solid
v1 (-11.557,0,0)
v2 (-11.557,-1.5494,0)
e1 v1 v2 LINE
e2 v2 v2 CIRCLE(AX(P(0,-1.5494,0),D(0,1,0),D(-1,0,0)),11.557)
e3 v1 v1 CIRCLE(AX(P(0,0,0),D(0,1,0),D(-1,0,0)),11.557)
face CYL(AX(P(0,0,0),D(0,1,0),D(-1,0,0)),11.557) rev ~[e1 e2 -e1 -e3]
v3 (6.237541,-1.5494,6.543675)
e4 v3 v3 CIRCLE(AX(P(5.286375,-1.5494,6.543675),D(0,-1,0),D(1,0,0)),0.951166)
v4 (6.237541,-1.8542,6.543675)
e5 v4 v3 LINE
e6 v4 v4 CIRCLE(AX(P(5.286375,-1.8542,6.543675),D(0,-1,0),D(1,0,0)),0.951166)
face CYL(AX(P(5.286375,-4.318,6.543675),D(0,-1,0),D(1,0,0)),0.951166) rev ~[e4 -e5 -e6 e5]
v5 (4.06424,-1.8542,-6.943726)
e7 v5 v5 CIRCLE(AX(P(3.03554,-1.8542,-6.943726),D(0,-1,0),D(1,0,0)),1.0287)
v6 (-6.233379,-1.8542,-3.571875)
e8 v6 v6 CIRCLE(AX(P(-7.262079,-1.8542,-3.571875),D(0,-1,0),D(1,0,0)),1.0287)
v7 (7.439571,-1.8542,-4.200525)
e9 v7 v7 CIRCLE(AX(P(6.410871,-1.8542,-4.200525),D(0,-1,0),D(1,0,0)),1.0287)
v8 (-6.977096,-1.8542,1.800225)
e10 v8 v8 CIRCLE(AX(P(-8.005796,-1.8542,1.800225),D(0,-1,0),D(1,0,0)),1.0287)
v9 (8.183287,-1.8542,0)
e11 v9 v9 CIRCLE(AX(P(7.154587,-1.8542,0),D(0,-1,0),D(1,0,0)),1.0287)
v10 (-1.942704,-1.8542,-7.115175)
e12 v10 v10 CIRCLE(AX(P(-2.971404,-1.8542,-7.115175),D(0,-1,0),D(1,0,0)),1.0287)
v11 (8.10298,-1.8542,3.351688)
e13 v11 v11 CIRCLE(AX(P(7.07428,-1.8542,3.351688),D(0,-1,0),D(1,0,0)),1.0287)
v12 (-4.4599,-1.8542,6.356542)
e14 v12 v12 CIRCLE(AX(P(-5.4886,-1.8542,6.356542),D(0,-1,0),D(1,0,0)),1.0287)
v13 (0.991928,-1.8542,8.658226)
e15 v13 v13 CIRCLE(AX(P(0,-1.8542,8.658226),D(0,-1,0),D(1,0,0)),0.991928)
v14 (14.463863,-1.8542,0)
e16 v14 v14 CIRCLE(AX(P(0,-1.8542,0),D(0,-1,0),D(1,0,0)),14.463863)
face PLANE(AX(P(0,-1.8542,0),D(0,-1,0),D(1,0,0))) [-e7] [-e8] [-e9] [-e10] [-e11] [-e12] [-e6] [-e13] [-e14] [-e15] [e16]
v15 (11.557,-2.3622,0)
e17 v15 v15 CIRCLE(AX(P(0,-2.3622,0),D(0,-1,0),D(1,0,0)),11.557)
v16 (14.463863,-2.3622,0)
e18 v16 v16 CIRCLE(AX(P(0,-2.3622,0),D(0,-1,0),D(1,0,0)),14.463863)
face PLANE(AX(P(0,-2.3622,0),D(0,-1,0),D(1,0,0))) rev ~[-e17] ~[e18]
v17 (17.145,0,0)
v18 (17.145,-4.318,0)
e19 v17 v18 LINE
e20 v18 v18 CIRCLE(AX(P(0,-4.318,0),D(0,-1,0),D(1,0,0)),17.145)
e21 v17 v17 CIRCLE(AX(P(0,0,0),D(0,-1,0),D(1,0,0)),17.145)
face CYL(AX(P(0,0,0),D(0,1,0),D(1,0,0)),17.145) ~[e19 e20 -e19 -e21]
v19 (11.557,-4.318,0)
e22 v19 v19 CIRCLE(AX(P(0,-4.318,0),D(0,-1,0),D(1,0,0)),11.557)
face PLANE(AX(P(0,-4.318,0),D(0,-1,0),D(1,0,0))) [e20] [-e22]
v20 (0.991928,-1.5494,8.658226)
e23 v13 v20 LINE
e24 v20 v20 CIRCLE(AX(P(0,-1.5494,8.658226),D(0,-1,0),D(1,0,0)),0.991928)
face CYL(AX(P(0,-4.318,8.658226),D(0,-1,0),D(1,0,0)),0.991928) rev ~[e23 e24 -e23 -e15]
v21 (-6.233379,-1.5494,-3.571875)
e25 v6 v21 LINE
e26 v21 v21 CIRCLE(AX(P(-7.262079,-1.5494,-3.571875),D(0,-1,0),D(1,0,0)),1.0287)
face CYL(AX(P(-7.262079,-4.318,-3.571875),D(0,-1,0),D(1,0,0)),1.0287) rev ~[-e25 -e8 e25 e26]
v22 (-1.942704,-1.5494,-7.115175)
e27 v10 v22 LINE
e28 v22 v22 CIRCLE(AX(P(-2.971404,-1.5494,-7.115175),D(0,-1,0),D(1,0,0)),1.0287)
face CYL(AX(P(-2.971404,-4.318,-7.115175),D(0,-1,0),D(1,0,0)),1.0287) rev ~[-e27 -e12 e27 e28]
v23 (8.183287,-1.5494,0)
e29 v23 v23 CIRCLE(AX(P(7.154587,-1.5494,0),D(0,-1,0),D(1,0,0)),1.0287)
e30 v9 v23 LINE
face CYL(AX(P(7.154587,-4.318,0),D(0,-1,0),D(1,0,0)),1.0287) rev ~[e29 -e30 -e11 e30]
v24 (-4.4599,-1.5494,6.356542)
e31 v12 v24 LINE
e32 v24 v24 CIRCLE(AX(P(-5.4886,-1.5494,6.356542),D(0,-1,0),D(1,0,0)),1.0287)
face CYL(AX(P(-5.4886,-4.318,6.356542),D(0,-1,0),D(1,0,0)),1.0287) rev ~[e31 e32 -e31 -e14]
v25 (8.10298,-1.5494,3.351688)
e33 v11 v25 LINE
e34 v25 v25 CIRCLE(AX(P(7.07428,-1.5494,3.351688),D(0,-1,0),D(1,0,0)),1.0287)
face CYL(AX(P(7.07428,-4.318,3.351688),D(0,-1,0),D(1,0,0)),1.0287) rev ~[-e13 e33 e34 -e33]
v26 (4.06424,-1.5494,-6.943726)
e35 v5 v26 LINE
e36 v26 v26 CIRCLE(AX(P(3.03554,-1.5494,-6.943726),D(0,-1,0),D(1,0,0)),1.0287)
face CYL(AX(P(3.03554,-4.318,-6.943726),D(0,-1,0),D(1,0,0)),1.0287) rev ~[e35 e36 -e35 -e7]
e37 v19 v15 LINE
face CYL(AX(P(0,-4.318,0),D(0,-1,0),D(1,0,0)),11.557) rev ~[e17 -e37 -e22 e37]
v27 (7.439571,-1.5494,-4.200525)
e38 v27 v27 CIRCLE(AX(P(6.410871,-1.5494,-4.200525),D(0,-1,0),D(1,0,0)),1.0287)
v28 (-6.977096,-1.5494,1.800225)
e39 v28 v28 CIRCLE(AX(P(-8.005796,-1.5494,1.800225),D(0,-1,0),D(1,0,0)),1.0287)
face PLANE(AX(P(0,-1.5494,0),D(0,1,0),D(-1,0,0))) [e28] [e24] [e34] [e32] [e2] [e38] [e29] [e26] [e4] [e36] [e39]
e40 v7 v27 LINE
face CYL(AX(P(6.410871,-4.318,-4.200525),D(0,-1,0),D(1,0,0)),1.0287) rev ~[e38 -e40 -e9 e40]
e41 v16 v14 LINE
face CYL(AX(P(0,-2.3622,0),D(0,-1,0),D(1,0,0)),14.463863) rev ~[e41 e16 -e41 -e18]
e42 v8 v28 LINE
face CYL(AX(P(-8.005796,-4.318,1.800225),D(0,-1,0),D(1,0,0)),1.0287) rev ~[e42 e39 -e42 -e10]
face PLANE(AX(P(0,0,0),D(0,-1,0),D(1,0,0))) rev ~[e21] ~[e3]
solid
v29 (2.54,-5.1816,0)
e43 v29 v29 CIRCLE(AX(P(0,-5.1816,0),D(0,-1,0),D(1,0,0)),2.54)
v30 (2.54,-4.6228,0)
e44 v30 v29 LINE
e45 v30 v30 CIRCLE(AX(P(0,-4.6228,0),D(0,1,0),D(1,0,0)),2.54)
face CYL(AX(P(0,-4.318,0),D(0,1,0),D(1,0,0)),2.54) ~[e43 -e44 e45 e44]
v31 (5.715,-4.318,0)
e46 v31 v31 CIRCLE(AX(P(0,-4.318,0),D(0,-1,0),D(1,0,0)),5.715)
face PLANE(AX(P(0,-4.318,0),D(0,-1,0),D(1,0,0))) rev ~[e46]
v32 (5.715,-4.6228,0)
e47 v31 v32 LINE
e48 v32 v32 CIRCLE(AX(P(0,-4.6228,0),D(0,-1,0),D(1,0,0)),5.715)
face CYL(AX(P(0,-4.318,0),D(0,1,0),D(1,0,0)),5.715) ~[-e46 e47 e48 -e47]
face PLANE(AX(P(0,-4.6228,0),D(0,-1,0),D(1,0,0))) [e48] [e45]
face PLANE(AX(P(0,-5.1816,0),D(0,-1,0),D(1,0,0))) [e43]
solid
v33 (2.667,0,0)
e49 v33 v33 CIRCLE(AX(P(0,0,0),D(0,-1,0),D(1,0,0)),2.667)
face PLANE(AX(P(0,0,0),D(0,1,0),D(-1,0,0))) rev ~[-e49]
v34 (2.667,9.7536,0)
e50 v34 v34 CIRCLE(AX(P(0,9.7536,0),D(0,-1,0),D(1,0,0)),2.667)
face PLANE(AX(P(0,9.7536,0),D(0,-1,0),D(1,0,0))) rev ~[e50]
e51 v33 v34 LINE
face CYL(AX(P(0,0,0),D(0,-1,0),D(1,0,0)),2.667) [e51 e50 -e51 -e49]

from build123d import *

# Parameters (mm, degrees)
F0_R      = 17.145
F1_DEPTH  = 4.318
F2_R      = 2.667
F3_DEPTH  = 9.7536
F4_R      = 2.54
F5_DEPTH  = 0.8636
F6_R      = 5.715
F7_DEPTH  = 0.3048
F8_R      = 11.557
F9_DEPTH  = 1.9558
F10_R     = 14.4638625387
F11_DEPTH = 0.508
F12_R     = 0.9919276493
F13_DEPTH = 35.4076
F14_R     = 11.557
F15_DEPTH = 1.5494
F18_R     = 0.9511664252
F19_DEPTH = 25.4
F20_R     = 1.0287
F21_DEPTH = 25.4
F22_R     = 1.0287
F23_DEPTH = 25.4


# Not quite as in the source:
# - the program builds the solid bodies; features that only make, move or delete a surface that nothing else refers to are left out


with BuildPart() as f1:
    # F0 (on Front) → F1 (new body)
    with BuildSketch(Plane.XZ):
        Circle(F0_R)
    extrude(amount=F1_DEPTH)

    # F2 (on Front) → F3 (join)
    with BuildSketch(Plane.XZ):
        Circle(F2_R)
    extrude(amount=-F3_DEPTH)

    # F4 (on face) → F5 (join)
    with BuildSketch(Plane.XZ.offset(4.318)):
        Circle(F4_R)
    extrude(amount=F5_DEPTH)

    # F6 (on face) → F7 (join)
    with BuildSketch(Plane.XZ.offset(4.318)):
        Circle(F6_R)
    extrude(amount=F7_DEPTH)

    # F8 (on face) → F9 (cut)
    with BuildSketch(Plane.XZ.offset(4.318)):
        Circle(F8_R)
    extrude(amount=-F9_DEPTH, mode=Mode.SUBTRACT)

    # F10 (on face) → F11 (cut)
    with BuildSketch(Plane.XZ.offset(2.3622)):
        Circle(F10_R)
    extrude(amount=-F11_DEPTH, mode=Mode.SUBTRACT)

    # F12 (on face) → F13 (cut)
    with BuildSketch(Plane.XZ.offset(4.318)):
        with Locations((0, 8.6582256481)):
            Circle(F12_R)
    extrude(amount=-F13_DEPTH, mode=Mode.SUBTRACT)

    # F14 (on face) → F15 (cut)
    with BuildSketch(Plane(origin=(0, 0, 0), x_dir=(-1, 0, 0), z_dir=(0, 1, 0))):
        Circle(F14_R)
    extrude(amount=-F15_DEPTH, mode=Mode.SUBTRACT)

    # F18 (on face) → F19 (cut)
    with BuildSketch(Plane.XZ.offset(4.318)):
        with Locations((5.286374595, 6.5436754376)):
            Circle(F18_R)
    extrude(amount=-F19_DEPTH, mode=Mode.SUBTRACT)

    # F20 (on face) → F21 (cut)
    with BuildSketch(Plane.XZ.offset(4.318)):
        with Locations((-8.0057960004, 1.8002251163)):
            Circle(F20_R)
        with Locations((-7.2620785795, -3.5718751606)):
            Circle(F20_R)
        with Locations((-2.9714044649, -7.1151754819)):
            Circle(F20_R)
        with Locations((3.035539994, -6.9437255152)):
            Circle(F20_R)
        with Locations((6.4108707011, -4.2005251162)):
            Circle(F20_R)
        with Locations((7.1545867249, 0)):
            Circle(F20_R)
        with Locations((7.0742800182, 3.3516884295)):
            Circle(F20_R)
    extrude(amount=-F21_DEPTH, mode=Mode.SUBTRACT)

    # F22 (on face) → F23 (cut)
    with BuildSketch(Plane.XZ.offset(4.318)):
        with Locations((-5.4886001162, 6.3565419987)):
            Circle(F22_R)
    extrude(amount=-F23_DEPTH, mode=Mode.SUBTRACT)


solid = f1.part
